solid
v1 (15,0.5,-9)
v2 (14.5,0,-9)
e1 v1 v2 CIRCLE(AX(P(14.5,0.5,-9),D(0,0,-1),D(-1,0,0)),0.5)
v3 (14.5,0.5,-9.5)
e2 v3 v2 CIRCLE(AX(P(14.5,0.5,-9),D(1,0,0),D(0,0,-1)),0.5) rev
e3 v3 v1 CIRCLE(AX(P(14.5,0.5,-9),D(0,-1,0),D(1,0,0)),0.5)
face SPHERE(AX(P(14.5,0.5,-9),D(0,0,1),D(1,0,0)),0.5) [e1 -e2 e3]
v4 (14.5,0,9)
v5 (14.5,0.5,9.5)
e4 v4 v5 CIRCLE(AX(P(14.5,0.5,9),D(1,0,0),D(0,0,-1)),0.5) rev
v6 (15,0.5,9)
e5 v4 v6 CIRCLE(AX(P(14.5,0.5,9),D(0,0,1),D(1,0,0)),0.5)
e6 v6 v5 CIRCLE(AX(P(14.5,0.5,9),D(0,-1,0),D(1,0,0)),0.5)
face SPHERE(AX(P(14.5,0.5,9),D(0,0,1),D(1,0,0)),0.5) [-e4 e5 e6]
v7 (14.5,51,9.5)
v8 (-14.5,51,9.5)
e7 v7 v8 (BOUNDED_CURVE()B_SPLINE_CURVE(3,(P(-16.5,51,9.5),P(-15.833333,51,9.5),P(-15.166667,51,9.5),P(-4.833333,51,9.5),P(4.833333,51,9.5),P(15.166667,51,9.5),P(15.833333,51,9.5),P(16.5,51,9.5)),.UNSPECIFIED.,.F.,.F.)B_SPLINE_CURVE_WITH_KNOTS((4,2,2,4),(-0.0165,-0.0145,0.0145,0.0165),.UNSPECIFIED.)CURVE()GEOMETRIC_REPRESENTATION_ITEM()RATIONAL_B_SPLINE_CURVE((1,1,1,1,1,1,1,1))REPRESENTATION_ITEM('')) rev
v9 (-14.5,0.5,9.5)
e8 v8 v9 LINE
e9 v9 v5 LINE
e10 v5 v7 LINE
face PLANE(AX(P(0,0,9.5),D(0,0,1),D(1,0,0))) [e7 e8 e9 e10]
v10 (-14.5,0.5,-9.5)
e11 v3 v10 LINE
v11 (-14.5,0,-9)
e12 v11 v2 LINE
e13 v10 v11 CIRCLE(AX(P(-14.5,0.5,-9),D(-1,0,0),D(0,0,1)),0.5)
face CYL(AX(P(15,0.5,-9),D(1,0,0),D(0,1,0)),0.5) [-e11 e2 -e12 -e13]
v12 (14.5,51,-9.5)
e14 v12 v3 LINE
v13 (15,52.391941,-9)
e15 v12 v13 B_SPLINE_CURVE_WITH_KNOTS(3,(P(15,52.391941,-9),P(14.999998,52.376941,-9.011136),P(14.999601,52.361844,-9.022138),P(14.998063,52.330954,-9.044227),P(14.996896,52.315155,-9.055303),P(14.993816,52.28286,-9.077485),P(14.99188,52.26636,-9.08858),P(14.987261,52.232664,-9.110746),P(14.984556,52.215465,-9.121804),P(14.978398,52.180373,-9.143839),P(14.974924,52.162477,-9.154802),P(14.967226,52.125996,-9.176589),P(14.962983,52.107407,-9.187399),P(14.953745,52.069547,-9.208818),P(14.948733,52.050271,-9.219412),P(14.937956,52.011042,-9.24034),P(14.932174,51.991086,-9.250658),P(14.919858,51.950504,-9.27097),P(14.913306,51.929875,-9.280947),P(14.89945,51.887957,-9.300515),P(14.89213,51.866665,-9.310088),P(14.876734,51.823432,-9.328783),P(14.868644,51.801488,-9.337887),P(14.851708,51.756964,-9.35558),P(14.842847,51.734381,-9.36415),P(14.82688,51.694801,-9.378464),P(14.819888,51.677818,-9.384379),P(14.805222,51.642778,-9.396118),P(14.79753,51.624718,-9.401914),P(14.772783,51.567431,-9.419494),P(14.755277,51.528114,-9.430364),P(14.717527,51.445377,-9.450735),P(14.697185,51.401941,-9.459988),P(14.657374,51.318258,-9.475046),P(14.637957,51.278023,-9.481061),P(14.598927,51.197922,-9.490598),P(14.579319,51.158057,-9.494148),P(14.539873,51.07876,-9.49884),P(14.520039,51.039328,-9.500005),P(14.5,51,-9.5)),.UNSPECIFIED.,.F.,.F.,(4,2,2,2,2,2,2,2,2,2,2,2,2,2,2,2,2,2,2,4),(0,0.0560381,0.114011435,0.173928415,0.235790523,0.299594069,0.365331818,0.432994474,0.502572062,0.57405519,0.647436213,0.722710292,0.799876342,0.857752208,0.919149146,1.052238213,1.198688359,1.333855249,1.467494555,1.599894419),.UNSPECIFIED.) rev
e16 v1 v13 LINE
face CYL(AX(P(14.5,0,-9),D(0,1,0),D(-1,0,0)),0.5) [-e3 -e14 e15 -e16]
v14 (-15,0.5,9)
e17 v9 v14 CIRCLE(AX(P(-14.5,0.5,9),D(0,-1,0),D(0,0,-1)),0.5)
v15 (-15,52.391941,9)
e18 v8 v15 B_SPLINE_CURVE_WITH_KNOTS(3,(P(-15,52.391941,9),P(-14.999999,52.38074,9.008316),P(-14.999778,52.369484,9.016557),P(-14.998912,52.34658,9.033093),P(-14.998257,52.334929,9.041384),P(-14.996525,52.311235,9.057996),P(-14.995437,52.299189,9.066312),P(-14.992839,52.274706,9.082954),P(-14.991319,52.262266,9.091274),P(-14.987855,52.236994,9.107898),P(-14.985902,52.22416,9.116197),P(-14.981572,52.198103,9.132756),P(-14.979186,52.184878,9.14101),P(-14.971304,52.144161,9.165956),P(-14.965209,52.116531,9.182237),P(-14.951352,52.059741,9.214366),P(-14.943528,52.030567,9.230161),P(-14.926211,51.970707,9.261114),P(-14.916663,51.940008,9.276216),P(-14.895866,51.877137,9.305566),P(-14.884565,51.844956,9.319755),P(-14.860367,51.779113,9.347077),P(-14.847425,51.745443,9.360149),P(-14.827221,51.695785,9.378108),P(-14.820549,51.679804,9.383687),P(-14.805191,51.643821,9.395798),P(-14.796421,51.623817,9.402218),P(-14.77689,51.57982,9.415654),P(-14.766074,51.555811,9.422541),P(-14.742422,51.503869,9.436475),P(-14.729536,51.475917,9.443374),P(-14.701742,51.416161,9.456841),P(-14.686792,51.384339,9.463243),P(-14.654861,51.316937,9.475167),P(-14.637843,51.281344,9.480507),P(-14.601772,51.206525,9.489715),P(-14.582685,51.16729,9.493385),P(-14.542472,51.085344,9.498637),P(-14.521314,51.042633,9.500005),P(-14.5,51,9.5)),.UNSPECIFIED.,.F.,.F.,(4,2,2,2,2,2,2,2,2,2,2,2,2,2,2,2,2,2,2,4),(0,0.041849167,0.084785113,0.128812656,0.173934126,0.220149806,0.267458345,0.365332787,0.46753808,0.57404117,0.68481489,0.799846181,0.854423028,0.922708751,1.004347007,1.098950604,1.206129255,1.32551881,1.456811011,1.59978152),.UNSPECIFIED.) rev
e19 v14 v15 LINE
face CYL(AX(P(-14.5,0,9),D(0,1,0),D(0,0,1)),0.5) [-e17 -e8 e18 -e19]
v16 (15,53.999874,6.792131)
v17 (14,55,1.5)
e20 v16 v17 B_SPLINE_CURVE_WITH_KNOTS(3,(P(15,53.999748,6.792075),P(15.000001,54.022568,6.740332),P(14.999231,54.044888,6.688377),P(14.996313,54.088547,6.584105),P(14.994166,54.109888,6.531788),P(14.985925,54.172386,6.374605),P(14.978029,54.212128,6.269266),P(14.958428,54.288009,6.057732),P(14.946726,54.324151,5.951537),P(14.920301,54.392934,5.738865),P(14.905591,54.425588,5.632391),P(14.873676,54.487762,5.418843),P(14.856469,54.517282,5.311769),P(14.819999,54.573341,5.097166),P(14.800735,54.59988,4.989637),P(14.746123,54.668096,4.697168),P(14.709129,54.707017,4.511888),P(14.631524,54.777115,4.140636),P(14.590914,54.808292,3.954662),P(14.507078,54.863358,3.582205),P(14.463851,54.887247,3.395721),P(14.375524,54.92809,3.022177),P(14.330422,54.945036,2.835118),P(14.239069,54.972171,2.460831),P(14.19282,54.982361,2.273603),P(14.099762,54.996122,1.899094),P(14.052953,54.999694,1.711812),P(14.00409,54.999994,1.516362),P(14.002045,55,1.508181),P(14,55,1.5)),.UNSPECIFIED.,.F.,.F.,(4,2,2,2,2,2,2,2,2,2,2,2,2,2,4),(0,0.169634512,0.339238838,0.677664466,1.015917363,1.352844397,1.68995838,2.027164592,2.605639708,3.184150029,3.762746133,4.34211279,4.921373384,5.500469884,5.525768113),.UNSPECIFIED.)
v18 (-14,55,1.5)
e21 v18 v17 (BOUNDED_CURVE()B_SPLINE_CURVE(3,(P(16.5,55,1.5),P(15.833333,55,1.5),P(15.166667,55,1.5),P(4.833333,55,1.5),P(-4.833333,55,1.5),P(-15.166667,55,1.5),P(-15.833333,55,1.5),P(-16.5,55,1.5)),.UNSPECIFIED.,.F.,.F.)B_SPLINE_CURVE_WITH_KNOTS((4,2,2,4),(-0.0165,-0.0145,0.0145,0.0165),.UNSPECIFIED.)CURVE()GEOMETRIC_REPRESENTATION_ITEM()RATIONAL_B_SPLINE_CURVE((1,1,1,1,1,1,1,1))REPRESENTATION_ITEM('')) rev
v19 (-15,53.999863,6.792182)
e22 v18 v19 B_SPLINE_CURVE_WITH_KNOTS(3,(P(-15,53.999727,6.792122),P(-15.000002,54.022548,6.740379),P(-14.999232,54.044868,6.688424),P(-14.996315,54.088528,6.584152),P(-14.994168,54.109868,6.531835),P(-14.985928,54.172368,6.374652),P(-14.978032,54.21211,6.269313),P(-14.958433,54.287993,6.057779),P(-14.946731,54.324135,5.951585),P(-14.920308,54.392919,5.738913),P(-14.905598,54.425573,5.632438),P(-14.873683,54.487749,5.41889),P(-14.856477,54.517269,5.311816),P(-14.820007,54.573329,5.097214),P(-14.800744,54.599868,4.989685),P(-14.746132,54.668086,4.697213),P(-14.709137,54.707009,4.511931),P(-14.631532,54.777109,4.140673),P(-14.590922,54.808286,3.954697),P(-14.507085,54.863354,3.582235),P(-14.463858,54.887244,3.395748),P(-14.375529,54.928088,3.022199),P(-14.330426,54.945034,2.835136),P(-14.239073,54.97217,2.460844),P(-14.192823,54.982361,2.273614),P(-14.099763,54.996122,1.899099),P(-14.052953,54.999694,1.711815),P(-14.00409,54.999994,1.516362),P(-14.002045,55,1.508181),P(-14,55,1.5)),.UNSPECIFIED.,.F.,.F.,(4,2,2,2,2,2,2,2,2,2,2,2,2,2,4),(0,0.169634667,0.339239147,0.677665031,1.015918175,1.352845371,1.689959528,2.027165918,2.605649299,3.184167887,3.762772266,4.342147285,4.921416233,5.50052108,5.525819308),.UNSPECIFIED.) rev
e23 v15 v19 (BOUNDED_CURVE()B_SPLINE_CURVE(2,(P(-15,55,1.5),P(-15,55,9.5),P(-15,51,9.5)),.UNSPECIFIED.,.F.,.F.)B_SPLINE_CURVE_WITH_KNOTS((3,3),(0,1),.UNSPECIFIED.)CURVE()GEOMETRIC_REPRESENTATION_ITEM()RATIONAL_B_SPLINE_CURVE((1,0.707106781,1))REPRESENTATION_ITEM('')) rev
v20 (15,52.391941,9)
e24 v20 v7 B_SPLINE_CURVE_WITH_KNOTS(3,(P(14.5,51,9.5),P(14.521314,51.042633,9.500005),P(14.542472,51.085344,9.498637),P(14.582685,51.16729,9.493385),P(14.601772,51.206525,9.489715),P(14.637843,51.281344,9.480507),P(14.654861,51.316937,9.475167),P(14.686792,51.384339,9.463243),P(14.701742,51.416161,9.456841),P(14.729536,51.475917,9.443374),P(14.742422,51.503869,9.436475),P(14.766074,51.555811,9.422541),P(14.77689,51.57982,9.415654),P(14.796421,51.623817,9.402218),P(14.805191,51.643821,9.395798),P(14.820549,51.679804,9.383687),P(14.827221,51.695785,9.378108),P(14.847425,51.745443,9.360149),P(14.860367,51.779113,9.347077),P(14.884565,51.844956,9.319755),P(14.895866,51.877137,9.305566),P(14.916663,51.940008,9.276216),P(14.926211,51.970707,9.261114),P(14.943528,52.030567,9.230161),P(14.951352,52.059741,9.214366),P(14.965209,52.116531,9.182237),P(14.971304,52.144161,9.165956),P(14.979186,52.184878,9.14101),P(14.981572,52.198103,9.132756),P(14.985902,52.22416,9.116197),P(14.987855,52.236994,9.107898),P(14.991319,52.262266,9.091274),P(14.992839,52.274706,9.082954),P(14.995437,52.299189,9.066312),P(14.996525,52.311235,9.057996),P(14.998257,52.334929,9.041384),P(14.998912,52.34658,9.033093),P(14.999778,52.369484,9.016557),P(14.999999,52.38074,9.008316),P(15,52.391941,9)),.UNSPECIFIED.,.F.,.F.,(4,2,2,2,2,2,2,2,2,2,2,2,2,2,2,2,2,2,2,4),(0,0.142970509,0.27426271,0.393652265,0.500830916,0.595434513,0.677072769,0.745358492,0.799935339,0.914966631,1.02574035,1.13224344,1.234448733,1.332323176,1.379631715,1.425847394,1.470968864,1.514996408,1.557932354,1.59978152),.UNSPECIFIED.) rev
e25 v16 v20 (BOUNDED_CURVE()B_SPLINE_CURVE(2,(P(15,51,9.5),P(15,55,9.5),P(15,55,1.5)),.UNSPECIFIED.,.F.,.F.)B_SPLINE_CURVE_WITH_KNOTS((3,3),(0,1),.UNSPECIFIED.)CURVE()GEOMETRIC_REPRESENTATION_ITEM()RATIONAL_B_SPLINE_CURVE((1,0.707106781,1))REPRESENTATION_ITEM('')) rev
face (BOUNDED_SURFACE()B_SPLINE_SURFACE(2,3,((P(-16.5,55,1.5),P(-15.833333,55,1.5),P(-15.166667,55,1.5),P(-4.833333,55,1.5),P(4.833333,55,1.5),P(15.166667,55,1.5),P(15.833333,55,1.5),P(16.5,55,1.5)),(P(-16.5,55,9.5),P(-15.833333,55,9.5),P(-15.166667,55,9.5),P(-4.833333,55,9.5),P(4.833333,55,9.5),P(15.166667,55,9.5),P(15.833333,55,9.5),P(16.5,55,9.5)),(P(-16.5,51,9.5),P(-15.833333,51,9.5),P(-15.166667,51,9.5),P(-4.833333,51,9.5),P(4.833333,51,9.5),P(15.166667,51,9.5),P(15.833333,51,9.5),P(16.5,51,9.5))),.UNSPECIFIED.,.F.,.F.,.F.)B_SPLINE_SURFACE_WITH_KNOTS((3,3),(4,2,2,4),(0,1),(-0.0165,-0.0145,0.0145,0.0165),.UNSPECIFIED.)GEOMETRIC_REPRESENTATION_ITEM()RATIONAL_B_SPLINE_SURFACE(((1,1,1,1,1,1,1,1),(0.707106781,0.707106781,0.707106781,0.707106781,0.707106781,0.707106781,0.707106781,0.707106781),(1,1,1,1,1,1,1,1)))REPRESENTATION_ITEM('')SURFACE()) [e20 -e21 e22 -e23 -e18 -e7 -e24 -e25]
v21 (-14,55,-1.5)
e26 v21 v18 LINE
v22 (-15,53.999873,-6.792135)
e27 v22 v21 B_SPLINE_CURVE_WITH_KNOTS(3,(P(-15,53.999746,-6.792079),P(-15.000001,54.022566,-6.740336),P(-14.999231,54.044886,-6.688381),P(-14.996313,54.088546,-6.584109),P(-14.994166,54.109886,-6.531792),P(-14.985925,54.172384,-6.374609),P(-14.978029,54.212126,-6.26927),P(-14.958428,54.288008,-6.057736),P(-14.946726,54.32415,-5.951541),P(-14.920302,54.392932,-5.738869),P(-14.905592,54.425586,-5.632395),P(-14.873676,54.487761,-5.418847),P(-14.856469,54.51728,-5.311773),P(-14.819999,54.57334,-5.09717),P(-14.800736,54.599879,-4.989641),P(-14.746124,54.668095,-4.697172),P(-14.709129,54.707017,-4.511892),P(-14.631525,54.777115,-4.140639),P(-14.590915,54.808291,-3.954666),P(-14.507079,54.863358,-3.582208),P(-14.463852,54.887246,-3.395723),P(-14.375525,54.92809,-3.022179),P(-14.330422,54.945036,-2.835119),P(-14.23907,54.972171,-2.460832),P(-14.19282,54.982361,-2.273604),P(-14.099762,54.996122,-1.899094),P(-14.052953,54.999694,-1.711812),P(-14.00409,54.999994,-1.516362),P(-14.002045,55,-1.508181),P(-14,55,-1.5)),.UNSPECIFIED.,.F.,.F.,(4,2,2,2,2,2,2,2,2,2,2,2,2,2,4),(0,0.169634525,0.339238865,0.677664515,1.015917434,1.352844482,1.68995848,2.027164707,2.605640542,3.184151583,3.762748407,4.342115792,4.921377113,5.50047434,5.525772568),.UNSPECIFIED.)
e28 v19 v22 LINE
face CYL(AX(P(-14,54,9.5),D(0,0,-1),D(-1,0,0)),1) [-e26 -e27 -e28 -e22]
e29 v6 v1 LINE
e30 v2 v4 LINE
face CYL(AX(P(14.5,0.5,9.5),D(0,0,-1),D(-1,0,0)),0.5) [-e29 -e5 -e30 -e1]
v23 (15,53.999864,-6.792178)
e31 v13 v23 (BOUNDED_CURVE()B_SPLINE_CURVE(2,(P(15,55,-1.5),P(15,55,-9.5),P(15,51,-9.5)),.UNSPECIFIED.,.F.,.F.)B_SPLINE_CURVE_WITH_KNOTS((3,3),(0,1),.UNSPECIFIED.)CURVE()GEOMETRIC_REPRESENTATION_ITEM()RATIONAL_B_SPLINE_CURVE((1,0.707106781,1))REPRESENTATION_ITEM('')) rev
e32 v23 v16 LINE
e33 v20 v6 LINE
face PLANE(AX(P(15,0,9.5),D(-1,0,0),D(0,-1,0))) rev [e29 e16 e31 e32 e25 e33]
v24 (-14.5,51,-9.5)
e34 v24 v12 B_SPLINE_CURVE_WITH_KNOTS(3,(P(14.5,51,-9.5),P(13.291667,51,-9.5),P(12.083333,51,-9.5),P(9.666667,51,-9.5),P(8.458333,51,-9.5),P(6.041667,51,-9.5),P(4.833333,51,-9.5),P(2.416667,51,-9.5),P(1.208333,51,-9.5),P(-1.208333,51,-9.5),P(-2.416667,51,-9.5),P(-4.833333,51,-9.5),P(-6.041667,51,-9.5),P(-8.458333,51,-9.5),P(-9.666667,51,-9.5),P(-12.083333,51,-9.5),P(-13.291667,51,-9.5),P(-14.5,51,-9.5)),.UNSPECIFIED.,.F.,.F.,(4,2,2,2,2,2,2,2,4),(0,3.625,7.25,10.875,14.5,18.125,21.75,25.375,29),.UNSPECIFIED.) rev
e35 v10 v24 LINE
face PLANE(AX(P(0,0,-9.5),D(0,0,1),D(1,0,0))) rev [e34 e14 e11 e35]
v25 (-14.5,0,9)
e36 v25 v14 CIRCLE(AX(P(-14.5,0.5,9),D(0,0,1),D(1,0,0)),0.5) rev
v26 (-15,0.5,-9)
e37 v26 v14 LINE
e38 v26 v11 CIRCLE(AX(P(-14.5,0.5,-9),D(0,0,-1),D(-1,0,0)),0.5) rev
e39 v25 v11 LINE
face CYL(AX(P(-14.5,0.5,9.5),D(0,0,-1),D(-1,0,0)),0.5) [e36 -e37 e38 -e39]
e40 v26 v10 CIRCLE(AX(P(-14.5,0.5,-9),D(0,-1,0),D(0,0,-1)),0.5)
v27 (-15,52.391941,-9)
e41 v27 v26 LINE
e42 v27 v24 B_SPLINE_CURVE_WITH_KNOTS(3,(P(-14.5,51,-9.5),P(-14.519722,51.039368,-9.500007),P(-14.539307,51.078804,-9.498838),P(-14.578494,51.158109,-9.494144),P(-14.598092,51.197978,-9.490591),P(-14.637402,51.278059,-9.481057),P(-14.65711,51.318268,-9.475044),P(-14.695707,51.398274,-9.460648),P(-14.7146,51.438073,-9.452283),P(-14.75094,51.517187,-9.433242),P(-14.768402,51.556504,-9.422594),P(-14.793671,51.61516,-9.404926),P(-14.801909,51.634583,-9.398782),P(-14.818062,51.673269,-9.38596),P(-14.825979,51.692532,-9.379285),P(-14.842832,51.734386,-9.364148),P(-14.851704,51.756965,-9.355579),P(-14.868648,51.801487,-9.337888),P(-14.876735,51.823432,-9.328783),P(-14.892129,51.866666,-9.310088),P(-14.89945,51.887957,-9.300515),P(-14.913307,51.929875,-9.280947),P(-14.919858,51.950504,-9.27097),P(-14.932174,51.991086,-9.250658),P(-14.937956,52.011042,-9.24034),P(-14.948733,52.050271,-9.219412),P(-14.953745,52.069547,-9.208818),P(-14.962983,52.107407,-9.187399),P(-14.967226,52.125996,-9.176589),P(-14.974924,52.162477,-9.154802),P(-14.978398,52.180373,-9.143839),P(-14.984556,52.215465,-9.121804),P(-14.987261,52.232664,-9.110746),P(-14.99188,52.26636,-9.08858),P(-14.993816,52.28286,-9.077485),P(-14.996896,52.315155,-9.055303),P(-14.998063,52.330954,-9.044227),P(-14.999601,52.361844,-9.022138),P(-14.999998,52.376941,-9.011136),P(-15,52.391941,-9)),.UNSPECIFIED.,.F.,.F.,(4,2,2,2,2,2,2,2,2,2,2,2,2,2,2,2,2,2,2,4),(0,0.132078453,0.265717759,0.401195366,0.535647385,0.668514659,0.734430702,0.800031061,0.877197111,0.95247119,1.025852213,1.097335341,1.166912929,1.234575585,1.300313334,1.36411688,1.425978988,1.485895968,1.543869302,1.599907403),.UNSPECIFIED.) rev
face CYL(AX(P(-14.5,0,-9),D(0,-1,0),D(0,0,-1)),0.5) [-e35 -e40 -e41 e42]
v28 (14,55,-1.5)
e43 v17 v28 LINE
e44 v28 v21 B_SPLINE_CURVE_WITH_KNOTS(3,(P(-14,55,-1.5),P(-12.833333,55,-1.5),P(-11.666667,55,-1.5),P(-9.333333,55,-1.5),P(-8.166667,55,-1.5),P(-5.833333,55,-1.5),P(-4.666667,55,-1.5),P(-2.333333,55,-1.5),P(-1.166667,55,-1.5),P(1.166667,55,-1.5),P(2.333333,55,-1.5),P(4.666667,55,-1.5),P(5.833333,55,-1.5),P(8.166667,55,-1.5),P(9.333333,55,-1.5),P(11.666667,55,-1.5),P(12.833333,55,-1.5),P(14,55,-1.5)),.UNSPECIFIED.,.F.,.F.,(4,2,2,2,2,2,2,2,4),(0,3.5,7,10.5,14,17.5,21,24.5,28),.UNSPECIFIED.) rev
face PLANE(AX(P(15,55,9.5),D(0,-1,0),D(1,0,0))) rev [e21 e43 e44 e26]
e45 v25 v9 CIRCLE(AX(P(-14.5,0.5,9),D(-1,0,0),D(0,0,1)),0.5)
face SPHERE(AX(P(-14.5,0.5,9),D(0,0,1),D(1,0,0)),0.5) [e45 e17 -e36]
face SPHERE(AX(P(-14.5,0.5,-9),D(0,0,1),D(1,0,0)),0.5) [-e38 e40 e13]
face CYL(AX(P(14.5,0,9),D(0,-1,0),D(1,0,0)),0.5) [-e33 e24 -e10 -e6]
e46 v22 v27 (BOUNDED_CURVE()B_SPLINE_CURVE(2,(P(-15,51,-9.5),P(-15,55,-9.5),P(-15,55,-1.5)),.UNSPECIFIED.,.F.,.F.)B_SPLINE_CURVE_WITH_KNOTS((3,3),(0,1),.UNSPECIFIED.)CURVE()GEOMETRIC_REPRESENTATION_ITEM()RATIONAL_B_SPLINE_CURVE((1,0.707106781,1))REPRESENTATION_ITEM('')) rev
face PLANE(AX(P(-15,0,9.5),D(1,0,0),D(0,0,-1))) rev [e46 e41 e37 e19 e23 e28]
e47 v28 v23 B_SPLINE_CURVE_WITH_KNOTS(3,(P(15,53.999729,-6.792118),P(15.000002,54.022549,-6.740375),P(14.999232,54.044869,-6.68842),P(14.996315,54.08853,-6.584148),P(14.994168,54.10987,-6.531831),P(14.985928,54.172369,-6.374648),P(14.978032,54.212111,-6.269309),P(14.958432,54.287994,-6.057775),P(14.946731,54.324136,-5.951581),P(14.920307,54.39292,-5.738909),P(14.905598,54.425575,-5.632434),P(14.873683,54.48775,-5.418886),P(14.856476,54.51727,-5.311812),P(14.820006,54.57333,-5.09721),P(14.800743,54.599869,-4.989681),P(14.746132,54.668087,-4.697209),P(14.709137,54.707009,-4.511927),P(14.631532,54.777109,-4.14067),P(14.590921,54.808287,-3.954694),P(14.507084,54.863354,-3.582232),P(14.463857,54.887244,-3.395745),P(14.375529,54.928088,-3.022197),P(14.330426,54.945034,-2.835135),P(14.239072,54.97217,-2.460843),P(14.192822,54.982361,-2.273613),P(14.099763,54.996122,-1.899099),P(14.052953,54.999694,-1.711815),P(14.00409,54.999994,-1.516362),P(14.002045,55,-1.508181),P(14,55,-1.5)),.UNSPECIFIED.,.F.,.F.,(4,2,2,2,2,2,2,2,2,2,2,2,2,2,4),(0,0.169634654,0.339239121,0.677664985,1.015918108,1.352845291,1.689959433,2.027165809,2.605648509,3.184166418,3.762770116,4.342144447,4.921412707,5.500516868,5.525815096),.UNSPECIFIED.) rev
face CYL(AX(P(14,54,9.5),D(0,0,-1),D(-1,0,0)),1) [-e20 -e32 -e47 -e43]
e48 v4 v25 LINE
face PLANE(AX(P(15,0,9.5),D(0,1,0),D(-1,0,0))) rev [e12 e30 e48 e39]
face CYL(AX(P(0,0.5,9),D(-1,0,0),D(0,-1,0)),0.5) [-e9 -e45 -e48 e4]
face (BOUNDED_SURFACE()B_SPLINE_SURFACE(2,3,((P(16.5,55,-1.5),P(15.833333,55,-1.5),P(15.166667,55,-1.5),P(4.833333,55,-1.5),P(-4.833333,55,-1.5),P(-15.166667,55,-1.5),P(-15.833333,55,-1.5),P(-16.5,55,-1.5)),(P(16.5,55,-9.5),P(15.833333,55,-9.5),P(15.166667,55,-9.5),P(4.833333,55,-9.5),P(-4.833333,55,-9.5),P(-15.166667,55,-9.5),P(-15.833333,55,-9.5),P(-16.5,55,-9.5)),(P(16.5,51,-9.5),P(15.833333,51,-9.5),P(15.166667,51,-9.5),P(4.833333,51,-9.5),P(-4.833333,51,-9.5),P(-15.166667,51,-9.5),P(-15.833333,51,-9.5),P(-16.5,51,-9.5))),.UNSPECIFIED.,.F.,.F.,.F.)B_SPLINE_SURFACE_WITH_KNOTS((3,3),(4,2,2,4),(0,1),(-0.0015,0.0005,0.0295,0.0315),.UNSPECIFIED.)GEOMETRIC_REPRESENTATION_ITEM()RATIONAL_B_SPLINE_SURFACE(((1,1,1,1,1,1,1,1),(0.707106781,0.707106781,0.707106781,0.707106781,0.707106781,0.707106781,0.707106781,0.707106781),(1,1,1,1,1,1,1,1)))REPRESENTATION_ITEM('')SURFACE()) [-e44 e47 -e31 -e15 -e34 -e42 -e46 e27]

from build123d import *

# Parameters (mm, degrees)
SKETCH1_W           = 30
SKETCH1_H           = 55
BOSS_EXTRUDE1_DEPTH = 9.5
FILLET1_R           = 0.5
FILLET2_SIZE        = 4
FILLET2_SIZE_2      = 8
FILLET3_START       = -16
FILLET3_DEPTH       = 32
FILLET4_R           = 1


with BuildPart() as part:
    # Sketch1 → Boss-Extrude1 (new, symmetric)
    with BuildSketch(Plane.XY):
        with Locations((0, 27.5)):
            Rectangle(SKETCH1_W, SKETCH1_H)
    extrude(amount=BOSS_EXTRUDE1_DEPTH, both=True)

    # Fillet1
    fillet1_edges = [part.edges().sort_by_distance(p)[0] for p in [
        (-15, 27.5, 9.5),
        (0, 0, 9.5),
        (15, 27.5, 9.5),
        (0, 0, -9.5),
        (-15, 27.5, -9.5),
        (15, 27.5, -9.5),
        (15, 0, 0),
        (-15, 0, 0),
    ]]
    fillet(fillet1_edges, radius=FILLET1_R)

    # Fillet2
    # a fillet whose section is not a circle: 8, 4 mm, written as the material it takes off along each edge
    with BuildSketch(Plane(origin=(-34.5, 55, 9.5), x_dir=(0, -1, 0), z_dir=(1, 0, 0))) as fillet2_piece_1:
        with BuildLine():
            Bezier((FILLET2_SIZE, 0), (0, 0), (0, FILLET2_SIZE_2), weights=[1, 0.707106781, 1])
            Line((0, FILLET2_SIZE_2), (0, 0))
            Line((0, 0), (FILLET2_SIZE, 0))
        make_face()
    extrude(amount=69, mode=Mode.SUBTRACT)

    # Fillet3: read off the stored shape, not the designer's step
    # Fillet3 outline → Fillet3 (cut)
    with BuildSketch(Plane.YZ.offset(FILLET3_START)):
        with BuildLine():
            Line((55, -9.5), (55, -1.5))
            add(Edge.make_bspline(
                [(55, -1.5), (55, -9.5), (51, -9.5)],
                knots=[0, 0, 0, 1, 1, 1], degree=2, weights=[1, 0.707106781, 1]))
            Line((51, -9.5), (55, -9.5))
        make_face()
    extrude(amount=FILLET3_DEPTH, mode=Mode.SUBTRACT)

    # Fillet4
    # the kernel refuses this fillet: 1 mm, written as the material it takes off along each edge
    with BuildSketch(Plane(origin=(-15, 55, 9), x_dir=(0, -1, 0), z_dir=(0, 0, -1)), Plane(origin=(15, 55, -9), x_dir=(0, -1, 0), z_dir=(0, 0, 1))) as fillet4_piece_1:
        with BuildLine():
            CenterArc((FILLET4_R, -FILLET4_R), FILLET4_R, 90, 90)
            Line((0, -FILLET4_R), (0, 0))
            Line((0, 0), (FILLET4_R, 0))
        make_face()
    extrude(amount=18, mode=Mode.SUBTRACT)


solid = part.part
